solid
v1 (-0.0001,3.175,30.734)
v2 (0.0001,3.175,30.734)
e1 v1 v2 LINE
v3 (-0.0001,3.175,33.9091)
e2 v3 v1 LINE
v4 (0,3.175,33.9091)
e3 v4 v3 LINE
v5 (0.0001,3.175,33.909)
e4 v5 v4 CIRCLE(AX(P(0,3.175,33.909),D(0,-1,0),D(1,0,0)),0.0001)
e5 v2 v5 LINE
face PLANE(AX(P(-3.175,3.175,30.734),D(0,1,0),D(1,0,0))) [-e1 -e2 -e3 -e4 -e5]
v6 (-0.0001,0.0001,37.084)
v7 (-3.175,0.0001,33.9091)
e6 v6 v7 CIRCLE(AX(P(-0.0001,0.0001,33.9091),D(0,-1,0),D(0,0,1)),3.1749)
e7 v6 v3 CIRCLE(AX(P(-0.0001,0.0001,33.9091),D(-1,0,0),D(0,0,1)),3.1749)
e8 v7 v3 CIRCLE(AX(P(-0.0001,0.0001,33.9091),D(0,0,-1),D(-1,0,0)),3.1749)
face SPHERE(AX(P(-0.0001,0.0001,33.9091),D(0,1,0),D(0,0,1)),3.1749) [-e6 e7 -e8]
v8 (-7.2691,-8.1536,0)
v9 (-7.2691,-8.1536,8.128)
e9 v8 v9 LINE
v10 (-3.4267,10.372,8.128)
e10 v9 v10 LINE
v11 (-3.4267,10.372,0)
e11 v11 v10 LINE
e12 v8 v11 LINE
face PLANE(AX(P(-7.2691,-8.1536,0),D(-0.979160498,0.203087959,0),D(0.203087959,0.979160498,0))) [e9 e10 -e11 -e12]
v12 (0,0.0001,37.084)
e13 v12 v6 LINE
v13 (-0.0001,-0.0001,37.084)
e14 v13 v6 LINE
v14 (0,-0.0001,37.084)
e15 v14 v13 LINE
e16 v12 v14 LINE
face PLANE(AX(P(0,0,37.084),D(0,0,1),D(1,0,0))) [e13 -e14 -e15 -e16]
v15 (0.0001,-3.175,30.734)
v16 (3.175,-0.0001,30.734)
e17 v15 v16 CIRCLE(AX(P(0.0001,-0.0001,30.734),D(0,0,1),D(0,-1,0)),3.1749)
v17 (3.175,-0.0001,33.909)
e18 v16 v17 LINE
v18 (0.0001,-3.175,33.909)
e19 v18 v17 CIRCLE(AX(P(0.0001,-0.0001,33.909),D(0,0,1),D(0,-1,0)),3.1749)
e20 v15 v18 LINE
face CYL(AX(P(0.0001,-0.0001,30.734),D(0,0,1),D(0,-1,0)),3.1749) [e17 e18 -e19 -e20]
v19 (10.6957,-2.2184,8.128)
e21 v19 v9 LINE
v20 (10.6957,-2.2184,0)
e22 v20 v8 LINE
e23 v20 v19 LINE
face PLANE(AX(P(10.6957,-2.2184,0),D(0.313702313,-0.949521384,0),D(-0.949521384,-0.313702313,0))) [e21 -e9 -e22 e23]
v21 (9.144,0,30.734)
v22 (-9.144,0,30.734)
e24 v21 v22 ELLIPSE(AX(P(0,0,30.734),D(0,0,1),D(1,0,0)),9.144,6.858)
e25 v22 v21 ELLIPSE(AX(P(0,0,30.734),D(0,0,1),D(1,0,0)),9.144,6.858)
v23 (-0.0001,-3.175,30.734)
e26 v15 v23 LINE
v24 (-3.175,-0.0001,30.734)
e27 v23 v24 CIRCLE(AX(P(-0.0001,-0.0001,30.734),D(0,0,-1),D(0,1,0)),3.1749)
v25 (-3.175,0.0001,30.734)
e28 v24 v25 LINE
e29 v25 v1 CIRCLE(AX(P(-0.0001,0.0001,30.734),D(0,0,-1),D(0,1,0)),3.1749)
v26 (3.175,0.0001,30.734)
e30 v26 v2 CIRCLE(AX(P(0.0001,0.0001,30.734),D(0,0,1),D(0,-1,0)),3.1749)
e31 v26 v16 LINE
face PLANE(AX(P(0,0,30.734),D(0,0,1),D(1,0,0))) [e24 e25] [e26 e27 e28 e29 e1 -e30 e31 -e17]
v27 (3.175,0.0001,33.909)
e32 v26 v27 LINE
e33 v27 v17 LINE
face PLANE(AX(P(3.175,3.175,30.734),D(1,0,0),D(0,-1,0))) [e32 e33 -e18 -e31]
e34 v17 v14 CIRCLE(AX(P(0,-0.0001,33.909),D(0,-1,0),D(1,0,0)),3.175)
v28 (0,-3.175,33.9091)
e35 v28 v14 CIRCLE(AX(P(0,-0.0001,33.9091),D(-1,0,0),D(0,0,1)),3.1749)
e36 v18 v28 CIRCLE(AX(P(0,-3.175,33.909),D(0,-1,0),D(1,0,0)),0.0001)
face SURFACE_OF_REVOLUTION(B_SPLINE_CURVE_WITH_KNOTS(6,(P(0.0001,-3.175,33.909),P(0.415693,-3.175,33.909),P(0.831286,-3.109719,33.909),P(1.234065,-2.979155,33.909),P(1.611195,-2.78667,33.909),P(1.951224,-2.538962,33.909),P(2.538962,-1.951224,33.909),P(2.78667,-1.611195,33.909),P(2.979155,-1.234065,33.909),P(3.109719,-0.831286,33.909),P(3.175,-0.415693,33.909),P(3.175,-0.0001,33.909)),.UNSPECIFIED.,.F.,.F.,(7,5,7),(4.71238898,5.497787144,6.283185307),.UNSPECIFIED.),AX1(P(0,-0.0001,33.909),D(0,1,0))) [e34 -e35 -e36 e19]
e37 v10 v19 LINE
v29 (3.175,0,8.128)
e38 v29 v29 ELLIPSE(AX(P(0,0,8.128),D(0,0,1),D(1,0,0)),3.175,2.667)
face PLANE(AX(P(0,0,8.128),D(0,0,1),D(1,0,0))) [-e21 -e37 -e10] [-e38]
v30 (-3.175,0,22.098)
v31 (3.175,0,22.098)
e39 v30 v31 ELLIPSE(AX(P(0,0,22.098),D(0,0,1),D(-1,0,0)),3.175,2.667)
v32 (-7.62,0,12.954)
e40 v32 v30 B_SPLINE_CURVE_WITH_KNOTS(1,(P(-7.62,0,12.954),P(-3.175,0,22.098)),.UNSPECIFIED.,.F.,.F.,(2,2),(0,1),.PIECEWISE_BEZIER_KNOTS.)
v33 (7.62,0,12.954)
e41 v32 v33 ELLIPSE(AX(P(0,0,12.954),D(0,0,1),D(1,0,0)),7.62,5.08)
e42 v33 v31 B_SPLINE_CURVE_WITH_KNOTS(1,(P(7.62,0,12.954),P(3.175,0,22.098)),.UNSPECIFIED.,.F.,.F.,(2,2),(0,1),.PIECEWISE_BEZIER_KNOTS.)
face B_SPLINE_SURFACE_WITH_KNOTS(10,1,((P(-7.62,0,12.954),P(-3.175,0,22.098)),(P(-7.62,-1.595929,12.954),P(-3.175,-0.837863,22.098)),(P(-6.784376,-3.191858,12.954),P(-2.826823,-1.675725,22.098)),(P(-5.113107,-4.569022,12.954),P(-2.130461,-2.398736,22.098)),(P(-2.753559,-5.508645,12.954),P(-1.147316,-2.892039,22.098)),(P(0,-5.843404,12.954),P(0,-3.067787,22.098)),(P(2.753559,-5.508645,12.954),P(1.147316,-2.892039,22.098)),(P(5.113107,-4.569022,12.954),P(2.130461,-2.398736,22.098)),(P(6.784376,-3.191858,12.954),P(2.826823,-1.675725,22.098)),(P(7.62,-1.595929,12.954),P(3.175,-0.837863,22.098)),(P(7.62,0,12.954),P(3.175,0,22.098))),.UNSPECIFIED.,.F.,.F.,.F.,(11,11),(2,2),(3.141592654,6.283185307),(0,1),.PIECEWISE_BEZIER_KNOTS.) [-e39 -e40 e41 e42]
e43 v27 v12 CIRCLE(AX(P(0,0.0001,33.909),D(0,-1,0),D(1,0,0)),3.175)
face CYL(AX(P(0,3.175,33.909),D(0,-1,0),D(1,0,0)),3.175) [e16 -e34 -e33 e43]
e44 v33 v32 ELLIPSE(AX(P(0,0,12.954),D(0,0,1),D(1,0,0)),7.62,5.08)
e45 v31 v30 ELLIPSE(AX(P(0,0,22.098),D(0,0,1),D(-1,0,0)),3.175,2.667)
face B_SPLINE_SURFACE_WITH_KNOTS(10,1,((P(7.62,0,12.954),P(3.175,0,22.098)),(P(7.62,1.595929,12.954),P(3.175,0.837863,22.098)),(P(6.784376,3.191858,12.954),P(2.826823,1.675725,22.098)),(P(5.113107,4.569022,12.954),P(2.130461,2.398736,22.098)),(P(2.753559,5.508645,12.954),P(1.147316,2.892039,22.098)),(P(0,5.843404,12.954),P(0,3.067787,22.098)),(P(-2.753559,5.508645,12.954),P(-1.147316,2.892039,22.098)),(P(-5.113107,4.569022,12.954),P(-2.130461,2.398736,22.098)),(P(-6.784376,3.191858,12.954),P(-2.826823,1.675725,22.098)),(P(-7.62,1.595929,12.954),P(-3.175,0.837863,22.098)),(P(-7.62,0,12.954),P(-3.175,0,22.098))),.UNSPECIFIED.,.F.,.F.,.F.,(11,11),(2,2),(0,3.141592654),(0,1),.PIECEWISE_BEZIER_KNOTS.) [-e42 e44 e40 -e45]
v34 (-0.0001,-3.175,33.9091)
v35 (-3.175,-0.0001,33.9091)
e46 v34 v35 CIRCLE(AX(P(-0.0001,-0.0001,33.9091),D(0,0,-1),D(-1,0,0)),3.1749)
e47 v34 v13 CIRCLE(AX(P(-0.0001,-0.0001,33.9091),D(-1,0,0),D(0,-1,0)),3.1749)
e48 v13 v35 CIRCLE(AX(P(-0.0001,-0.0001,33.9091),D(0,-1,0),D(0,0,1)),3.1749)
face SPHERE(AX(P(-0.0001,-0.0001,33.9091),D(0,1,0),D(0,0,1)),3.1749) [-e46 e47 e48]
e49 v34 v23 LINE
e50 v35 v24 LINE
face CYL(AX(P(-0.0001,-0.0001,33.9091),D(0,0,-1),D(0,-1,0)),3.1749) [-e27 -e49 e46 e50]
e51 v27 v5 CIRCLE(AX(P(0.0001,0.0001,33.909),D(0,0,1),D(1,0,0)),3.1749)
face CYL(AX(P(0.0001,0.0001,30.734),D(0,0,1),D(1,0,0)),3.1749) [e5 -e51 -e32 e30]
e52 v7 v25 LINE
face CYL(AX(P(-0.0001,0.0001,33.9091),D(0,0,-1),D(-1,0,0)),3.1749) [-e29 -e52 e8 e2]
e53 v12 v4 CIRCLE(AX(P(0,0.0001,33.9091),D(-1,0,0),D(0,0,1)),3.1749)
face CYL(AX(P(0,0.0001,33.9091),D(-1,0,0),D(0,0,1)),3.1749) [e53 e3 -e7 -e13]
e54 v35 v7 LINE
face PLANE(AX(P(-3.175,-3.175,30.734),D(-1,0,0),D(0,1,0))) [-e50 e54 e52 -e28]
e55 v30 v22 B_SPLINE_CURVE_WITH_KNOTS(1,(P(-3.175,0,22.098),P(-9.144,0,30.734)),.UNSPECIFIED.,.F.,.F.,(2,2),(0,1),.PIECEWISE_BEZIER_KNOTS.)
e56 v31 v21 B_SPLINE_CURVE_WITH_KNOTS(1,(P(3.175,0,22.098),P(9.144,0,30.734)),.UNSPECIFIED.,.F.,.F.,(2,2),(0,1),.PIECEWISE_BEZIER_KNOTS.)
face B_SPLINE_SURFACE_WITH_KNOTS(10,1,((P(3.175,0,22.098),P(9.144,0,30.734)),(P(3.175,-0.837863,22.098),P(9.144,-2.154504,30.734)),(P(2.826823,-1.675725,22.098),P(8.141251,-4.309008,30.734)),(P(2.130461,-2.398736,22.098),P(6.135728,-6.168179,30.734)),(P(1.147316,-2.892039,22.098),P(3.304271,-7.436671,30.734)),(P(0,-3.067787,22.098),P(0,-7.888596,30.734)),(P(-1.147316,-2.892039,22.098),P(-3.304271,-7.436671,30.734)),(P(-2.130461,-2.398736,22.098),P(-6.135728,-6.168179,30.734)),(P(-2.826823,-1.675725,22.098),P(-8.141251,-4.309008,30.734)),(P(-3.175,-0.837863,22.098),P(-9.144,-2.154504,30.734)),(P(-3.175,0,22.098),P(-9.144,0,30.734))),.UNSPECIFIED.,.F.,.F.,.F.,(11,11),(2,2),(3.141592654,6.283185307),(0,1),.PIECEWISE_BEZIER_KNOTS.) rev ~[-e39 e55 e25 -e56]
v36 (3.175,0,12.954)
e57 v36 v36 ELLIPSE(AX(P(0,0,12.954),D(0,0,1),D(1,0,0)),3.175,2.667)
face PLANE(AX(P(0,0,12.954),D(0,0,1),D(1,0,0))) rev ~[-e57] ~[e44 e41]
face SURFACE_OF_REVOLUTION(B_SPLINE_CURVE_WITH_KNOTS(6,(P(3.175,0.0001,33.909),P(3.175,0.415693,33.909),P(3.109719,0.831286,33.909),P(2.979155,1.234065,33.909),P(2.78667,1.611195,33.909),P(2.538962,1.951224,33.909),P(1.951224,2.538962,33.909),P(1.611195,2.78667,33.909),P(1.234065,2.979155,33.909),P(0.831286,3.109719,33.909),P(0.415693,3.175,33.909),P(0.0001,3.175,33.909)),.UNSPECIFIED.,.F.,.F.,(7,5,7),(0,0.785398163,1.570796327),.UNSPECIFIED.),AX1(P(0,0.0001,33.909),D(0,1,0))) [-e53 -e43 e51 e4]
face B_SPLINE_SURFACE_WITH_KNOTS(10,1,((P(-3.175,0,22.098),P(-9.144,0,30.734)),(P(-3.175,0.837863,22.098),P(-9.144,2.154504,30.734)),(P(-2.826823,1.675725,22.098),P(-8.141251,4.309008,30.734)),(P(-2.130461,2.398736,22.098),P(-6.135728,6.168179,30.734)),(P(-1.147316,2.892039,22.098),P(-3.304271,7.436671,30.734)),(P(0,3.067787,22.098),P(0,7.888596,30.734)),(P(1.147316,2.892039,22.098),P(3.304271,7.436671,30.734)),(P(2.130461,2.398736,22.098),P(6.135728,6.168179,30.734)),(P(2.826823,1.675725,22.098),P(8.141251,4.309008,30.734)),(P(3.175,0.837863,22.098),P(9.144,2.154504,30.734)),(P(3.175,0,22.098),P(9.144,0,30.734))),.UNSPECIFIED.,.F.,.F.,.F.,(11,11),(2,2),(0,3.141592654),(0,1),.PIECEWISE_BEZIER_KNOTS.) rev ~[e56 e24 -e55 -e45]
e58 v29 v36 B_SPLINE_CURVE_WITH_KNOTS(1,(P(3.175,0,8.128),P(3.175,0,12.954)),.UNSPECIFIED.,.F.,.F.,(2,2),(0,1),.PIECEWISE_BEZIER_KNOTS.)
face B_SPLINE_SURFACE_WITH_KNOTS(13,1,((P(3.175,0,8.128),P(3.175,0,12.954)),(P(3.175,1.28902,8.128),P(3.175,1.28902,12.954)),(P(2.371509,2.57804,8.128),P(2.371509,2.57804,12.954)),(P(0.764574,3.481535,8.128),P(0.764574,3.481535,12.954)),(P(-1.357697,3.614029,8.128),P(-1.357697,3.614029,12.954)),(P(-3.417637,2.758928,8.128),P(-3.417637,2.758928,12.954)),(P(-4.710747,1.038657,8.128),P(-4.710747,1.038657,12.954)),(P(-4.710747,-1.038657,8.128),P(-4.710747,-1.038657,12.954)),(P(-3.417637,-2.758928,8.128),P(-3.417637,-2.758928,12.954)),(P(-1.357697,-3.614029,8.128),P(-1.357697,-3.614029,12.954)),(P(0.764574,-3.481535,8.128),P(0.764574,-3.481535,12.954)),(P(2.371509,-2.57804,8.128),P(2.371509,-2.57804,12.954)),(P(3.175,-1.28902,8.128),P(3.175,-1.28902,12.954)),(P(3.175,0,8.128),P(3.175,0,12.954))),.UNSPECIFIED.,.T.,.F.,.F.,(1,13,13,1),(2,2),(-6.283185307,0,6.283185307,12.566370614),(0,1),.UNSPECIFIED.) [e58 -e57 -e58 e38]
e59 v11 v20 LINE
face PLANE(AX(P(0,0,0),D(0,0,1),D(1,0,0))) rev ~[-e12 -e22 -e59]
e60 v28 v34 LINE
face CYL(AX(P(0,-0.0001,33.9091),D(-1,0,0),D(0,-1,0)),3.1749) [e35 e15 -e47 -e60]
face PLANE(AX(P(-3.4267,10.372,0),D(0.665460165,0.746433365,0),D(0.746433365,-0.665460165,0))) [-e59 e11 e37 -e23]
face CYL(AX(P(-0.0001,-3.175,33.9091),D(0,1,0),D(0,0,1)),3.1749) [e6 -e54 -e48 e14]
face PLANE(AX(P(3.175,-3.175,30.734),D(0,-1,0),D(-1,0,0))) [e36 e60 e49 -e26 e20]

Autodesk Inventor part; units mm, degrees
ref_plane "YZ Plane" through (0, 0, 0) normal (1, 0, 0) x (0, 1, 0)
ref_plane "XZ Plane" through (0, 0, 0) normal (0, 1, 0) x (-1, 0, 0)
ref_plane "XY Plane" through (0, 0, 0) normal (0, 0, 1) x (1, 0, 0)
sketch "Sketch1" plane through (0, 0, 0) normal (0, 0, 1) x (1, 0, 0)
  line L0 (-3.4267, 10.372) -> (10.6957, -2.2184)
  line L1 (10.6957, -2.2184) -> (-7.2691, -8.1536)
  line L2 (-7.2691, -8.1536) -> (-3.4267, 10.372)
  ellipse E0 centre (0, 0) end of major axis (3.175, 0) minor radius 2.667
  dimension "d1" = 3.175
  dimension "d2" = 2.667
  dimension "d0" = 14.1224
extrude "Extrusion1" add sketch "Sketch1" along normal blind 8.128 contours L0 L1 L2 | E0
ref_plane "Work Plane2" through (0, 0, 12.954) normal (0, 0, 1) x (1, 0, 0)
sketch "Sketch2" plane through (0, 0, 12.954) normal (0, 0, 1) x (1, 0, 0)
  point P0 (0, 0)
sketch "Sketch3" plane through (0, 0, 12.954) normal (0, 0, 1) x (1, 0, 0)
  point P0 (0, 0)
sketch "Sketch4" plane through (0, 0, 12.954) normal (0, 0, 1) x (1, 0, 0)
  ellipse E0 centre (0, 0) end of major axis (3.175, 0) minor radius 2.667
  dimension "d6" = 3.175
  dimension "d7" = 2.667
sketch "Sketch5" plane through (0, 0, 12.954) normal (0, 0, 1) x (1, 0, 0)
  line L0 (10.6957, -2.2184) -> (-3.4267, 10.372) projected
  line L1 (-3.4267, 10.372) -> (-7.2691, -8.1536) projected
  line L2 (-7.2691, -8.1536) -> (10.6957, -2.2184) projected
sketch "Sketch6" plane through (0, 0, 8.128) normal (0, 0, 1) x (1, 0, 0)
  ellipse E0 centre (0, 0) end of major axis (3.175, 0) minor radius 2.667 projected
  ellipse E1 centre (0, 0) end of major axis (3.175, 0) minor radius 2.667
loft "Loft1" add profiles "Sketch6", "Sketch4"
ref_plane "Work Plane4" through (0, 0, 30.734) normal (0, 0, 1) x (1, 0, 0)
ref_plane "Work Plane3" through (0, 0, 22.098) normal (0, 0, 1) x (1, 0, 0)
sketch "Sketch7" plane through (0, 0, 22.098) normal (0, 0, 1) x (1, 0, 0)
  ellipse E0 centre (0, 0) end of major axis (-3.175, 0) minor radius 2.667 projected
sketch "Sketch8" plane through (0, 0, 22.098) normal (0, 0, 1) x (1, 0, 0)
  ellipse E0 centre (0, 0) end of major axis (3.175, 0) minor radius 2.667
  ellipse E1 centre (0, 0) end of major axis (-3.175, 0) minor radius 2.667 projected
sketch "Sketch9" plane through (0, 0, 12.954) normal (0, 0, 1) x (1, 0, 0)
  ellipse E0 centre (0, 0) end of major axis (7.62, 0) minor radius 5.08
  dimension "d16" = 7.62
  dimension "d17" = 5.08
loft "Loft2" add profiles "Sketch9", "Sketch7"
sketch "Sketch10" plane through (0, 0, 30.734) normal (0, 0, 1) x (1, 0, 0)
  ellipse E0 centre (0, 0) end of major axis (9.144, 0) minor radius 6.858
  dimension "d22" = 6.858
  dimension "d23" = 9.144
loft "Loft3" add profiles "Sketch10" section 1 edges at (0, 2.667, 22.098) (0, -2.667, 22.098)
sketch "Sketch11" plane through (0, 0, 30.734) normal (0, 0, 1) x (1, 0, 0)
  line L0 (-3.175, 3.175) -> (3.175, 3.175)
  line L1 (3.175, 3.175) -> (3.175, -3.175)
  line L2 (3.175, -3.175) -> (-3.175, -3.175)
  line L3 (-3.175, -3.175) -> (-3.175, 3.175)
  point P0 (0, 0)
  dimension "d28" = 6.35
  dimension "d29" = 6.35
  dimension "d30" = 3.175
  dimension "d31" = 3.175
extrude "Extrusion2" add sketch "Sketch11" along normal blind 6.35
fillet "Fillet1" radius 3.175 1 edges at (3.175, 0, 37.084)
fillet "Fillet2" radius 3.175 1 edges at (-3.175, 0, 37.084)
fillet "Fillet3" radius 3.175 3 edges at (3.175, 3.175, 32.3215) (2.2451, 3.175, 36.1541) (-3.175, 3.175, 32.3215)
fillet "Fillet4" radius 3.175 3 edges at (3.175, -3.175, 32.3215) (2.2451, -3.175, 36.1541) (-3.175, -3.175, 32.3215)
properties part number "girlNT"
